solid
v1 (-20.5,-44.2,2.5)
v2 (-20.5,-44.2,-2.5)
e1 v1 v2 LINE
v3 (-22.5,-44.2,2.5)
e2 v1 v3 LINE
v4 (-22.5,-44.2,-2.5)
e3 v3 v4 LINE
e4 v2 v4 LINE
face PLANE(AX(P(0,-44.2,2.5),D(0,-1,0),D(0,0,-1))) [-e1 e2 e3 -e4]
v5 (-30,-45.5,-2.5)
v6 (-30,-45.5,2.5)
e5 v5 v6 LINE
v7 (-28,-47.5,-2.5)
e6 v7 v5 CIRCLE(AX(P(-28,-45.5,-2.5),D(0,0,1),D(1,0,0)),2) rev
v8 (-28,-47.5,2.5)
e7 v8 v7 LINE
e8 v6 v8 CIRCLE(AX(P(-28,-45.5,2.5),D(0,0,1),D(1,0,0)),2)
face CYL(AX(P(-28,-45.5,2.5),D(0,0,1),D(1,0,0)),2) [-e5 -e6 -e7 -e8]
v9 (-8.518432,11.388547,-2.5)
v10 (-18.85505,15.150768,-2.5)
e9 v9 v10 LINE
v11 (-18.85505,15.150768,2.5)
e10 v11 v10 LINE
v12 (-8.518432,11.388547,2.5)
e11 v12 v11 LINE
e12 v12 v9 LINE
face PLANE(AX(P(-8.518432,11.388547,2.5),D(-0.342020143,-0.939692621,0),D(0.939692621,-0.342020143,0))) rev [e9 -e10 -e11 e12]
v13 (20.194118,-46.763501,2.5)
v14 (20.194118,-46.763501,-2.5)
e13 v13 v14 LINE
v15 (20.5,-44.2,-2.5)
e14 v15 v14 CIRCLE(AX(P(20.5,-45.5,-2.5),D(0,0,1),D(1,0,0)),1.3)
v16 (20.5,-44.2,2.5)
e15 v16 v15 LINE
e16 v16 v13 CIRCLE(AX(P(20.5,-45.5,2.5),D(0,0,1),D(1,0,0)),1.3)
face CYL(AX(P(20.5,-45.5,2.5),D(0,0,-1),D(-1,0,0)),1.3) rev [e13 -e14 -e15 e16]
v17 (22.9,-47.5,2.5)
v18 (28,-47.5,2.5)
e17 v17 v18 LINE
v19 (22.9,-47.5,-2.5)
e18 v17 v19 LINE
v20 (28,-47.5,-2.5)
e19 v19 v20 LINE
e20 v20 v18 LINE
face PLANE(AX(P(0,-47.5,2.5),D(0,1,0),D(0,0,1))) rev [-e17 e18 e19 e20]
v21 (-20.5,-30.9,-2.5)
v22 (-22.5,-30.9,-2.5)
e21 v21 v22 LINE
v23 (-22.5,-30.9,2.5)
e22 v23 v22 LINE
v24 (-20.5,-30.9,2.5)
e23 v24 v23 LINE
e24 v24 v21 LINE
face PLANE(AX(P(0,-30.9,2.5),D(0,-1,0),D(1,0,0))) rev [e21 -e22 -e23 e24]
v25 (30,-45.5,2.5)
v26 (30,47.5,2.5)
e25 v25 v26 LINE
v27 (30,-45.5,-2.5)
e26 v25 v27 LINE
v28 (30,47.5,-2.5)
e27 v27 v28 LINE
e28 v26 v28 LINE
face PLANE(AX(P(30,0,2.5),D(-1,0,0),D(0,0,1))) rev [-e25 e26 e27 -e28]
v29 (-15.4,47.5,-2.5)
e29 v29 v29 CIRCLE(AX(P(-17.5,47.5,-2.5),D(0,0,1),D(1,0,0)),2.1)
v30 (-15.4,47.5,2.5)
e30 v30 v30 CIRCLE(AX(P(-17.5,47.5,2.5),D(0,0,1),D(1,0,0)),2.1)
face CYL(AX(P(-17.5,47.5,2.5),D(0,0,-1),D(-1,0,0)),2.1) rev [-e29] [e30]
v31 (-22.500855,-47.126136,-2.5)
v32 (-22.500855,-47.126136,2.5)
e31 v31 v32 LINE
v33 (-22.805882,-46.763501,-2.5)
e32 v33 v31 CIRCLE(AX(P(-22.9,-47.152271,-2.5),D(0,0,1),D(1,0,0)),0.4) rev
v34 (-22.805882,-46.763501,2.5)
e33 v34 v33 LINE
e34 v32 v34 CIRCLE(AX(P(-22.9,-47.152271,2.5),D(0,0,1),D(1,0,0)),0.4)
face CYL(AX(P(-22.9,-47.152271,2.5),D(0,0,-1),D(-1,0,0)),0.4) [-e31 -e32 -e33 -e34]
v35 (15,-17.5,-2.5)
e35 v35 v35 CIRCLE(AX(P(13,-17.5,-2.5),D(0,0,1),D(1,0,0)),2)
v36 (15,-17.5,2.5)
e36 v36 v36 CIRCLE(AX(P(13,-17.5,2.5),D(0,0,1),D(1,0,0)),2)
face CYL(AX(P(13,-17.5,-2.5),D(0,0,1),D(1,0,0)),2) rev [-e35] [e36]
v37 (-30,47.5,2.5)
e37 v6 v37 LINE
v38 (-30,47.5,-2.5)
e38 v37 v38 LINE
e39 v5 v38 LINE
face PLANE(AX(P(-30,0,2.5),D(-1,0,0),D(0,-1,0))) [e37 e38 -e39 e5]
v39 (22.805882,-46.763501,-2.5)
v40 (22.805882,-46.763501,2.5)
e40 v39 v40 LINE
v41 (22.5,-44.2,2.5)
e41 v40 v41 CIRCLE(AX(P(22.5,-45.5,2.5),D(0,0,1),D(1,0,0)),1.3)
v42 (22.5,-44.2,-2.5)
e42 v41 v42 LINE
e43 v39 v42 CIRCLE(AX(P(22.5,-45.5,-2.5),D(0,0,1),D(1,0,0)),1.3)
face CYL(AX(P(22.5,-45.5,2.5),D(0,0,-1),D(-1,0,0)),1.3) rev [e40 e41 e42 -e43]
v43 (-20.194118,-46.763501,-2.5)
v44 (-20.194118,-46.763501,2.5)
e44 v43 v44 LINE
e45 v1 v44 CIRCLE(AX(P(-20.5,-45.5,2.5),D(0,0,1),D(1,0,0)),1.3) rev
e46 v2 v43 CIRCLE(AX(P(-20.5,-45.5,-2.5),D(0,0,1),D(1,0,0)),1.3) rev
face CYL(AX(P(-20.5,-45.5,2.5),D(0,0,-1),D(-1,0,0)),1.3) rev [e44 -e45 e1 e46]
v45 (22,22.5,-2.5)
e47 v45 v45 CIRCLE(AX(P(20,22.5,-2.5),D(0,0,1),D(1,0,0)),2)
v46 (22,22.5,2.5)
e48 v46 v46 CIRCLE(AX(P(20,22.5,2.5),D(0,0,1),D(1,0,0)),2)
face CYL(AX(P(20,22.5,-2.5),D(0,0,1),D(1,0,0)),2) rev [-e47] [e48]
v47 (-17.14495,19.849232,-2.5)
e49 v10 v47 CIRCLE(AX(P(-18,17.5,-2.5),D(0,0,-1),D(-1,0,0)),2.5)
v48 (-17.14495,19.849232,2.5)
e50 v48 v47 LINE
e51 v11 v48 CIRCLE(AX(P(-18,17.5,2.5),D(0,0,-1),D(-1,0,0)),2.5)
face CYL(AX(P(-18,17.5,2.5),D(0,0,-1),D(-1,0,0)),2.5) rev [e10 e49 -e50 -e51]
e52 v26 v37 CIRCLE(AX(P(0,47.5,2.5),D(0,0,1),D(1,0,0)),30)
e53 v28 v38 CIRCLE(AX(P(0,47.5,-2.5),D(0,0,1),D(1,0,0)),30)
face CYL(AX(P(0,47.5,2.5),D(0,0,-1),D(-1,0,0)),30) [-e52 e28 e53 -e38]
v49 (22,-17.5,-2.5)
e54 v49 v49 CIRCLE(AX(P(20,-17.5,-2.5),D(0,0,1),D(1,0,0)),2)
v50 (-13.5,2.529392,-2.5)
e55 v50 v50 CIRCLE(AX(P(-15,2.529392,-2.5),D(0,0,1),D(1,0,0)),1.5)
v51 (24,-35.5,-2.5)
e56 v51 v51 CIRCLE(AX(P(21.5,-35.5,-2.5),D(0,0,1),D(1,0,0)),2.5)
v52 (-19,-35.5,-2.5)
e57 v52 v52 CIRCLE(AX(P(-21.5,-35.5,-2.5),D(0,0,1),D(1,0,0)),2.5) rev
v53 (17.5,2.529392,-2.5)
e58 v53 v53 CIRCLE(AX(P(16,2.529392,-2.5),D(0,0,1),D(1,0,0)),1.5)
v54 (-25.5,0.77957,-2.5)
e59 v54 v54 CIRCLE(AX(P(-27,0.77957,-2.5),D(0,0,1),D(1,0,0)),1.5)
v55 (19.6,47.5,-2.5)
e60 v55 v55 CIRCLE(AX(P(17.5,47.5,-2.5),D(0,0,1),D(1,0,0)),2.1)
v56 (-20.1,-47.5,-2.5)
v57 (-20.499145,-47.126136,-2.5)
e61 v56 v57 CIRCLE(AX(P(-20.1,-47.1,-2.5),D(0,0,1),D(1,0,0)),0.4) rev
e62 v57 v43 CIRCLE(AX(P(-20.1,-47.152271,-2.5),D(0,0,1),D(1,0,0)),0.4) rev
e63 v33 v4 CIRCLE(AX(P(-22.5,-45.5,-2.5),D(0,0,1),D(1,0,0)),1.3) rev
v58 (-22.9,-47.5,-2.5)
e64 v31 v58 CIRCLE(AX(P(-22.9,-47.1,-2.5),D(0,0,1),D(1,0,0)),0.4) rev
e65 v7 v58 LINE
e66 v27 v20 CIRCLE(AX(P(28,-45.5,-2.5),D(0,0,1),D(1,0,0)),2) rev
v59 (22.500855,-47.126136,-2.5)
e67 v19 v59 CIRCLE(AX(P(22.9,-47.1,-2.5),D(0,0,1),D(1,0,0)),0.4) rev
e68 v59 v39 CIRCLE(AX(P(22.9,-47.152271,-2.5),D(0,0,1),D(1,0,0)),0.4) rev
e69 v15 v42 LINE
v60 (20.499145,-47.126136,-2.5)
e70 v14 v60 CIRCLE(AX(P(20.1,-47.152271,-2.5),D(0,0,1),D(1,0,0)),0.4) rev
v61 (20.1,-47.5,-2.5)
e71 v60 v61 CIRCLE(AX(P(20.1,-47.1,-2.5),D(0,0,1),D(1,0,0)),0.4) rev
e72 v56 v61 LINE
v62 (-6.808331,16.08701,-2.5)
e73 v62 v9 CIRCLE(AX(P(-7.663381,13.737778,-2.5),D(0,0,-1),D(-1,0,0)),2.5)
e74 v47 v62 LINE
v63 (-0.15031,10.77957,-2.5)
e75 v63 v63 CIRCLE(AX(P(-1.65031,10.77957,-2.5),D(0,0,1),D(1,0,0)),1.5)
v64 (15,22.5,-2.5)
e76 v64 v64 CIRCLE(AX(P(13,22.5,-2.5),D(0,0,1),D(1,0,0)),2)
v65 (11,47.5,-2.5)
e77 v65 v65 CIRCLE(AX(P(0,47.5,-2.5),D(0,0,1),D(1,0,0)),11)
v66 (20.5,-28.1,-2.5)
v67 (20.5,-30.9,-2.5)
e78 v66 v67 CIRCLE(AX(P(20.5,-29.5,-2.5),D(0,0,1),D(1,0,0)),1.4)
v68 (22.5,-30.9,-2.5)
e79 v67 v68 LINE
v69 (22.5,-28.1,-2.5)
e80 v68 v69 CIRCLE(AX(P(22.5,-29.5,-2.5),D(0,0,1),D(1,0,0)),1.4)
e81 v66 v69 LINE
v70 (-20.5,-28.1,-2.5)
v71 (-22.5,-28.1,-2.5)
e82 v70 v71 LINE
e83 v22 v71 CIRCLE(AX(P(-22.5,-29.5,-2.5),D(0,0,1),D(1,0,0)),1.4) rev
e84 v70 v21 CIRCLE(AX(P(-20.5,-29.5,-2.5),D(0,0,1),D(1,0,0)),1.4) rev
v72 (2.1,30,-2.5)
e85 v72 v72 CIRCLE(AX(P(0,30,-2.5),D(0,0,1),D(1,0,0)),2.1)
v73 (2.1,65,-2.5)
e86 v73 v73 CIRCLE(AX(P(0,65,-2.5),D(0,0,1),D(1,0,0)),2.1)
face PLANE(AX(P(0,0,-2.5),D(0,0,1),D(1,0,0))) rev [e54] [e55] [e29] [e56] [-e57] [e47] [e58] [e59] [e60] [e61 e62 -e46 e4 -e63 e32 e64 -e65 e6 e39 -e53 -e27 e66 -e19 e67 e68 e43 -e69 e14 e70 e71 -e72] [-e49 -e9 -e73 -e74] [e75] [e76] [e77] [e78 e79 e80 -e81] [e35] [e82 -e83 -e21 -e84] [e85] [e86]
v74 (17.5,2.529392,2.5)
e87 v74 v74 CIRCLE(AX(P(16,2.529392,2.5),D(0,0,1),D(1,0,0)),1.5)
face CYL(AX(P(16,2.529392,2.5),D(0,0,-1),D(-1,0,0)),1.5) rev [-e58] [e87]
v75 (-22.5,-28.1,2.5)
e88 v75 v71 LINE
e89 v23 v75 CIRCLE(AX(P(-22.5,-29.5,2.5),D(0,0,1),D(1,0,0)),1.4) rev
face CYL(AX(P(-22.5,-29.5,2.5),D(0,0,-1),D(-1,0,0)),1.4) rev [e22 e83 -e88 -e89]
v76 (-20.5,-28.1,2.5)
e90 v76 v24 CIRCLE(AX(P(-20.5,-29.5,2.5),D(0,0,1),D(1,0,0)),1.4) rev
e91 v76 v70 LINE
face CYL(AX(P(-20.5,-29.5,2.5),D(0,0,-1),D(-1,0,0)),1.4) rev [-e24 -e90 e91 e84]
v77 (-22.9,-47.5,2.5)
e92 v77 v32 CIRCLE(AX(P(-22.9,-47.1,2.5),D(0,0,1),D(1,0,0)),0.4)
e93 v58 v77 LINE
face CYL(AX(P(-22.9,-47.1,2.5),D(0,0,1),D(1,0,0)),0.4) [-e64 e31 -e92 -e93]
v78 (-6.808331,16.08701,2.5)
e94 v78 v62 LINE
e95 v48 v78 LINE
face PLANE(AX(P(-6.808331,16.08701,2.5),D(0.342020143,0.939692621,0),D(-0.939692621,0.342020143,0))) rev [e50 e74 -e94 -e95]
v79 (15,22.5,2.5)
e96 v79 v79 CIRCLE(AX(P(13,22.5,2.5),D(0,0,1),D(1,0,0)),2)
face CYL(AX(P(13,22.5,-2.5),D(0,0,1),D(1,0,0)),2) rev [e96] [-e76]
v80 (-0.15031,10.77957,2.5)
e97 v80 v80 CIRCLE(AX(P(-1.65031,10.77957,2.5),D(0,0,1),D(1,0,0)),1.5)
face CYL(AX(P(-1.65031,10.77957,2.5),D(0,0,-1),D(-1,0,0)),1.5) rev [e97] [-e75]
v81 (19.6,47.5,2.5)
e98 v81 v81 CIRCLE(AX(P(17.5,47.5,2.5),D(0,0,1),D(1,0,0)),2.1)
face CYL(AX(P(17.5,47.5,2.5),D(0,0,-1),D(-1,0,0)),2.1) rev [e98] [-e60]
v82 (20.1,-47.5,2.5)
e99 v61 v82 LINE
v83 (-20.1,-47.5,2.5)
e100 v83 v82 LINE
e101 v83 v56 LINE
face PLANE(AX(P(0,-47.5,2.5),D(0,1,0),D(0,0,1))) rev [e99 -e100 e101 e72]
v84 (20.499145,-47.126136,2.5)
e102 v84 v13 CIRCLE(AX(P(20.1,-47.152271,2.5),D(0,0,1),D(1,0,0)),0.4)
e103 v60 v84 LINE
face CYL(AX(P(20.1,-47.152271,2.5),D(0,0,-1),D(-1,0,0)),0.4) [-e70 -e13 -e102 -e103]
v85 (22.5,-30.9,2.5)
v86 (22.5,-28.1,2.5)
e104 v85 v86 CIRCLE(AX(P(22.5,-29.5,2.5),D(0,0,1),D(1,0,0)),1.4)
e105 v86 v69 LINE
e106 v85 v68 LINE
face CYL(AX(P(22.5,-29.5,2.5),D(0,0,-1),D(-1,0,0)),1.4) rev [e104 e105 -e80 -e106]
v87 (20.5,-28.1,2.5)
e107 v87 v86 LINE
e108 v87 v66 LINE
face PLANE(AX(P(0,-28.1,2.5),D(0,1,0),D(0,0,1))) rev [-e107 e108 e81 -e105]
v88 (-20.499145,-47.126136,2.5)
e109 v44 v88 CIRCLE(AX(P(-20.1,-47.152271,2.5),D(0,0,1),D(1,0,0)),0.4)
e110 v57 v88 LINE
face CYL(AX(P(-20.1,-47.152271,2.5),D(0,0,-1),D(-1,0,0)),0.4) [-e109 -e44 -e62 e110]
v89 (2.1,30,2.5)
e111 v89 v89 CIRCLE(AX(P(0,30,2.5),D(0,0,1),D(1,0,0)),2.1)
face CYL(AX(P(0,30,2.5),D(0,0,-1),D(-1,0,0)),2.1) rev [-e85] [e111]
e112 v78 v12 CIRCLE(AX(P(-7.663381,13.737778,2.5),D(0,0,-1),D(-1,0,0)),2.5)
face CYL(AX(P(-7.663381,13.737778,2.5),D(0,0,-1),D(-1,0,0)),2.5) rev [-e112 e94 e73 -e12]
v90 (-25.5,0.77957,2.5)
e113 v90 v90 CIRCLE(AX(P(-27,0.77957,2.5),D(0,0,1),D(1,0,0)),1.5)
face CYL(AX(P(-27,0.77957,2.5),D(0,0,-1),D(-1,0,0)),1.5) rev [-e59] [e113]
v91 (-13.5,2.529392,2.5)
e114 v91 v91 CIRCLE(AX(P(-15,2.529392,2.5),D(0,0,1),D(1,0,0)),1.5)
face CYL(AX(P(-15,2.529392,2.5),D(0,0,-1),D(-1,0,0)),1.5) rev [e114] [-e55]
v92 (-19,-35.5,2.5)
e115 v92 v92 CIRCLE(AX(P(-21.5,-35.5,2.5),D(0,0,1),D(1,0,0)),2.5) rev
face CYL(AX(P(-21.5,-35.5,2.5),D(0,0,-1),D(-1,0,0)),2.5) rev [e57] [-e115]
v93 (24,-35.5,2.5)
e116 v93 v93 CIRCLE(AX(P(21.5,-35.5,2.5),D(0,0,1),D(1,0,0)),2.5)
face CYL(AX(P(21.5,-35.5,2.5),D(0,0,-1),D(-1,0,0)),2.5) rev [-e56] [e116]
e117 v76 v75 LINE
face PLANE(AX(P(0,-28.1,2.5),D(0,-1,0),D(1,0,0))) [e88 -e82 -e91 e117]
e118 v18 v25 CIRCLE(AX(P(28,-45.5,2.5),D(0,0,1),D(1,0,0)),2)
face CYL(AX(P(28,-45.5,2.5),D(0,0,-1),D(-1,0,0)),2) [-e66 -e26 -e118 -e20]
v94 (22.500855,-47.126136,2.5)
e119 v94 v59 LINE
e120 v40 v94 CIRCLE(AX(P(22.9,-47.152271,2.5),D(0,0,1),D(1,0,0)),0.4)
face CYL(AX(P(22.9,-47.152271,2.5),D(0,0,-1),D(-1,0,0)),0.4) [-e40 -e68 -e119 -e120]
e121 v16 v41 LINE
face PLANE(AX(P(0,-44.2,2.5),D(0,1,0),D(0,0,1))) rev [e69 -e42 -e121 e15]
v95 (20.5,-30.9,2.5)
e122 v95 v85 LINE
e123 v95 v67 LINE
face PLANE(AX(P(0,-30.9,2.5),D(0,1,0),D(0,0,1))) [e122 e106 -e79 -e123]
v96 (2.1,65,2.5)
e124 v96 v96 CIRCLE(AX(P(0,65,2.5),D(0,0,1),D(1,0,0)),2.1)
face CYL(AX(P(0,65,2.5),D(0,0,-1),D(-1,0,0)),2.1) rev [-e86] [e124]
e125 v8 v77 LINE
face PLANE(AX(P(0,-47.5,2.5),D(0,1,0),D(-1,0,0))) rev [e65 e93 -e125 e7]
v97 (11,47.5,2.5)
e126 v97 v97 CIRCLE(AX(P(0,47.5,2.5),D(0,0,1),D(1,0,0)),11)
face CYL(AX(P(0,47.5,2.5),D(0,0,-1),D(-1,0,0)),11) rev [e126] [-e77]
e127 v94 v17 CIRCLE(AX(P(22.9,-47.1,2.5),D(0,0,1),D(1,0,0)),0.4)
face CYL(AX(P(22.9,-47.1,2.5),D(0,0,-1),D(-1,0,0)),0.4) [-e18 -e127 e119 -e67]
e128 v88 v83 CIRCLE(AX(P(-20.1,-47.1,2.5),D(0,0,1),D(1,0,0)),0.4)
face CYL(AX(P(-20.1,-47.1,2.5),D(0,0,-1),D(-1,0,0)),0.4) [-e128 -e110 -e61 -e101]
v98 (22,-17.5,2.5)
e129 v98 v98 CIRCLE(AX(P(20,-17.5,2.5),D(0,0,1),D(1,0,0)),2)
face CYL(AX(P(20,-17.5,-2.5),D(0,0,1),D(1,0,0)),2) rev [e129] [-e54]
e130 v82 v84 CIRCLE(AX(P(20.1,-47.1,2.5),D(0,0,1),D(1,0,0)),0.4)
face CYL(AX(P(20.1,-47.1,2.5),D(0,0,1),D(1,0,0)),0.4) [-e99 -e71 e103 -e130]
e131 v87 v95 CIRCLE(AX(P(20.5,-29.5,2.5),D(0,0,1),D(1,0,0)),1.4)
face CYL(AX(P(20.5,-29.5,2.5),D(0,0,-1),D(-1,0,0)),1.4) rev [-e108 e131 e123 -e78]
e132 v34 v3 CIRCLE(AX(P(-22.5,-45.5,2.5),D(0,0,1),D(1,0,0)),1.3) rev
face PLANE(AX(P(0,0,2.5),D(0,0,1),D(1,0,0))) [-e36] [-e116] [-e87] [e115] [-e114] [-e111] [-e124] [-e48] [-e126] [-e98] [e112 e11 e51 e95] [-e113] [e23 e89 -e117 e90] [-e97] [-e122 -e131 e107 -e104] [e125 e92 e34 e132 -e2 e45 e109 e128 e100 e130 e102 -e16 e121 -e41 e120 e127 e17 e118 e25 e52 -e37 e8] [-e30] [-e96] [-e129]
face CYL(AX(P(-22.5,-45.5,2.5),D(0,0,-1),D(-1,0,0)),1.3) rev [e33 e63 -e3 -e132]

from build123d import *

# Parameters (mm, degrees)
SKETCH1_R           = 11
SKETCH1_R_2         = 2.5
SKETCH1_R_3         = 2.1
SKETCH1_R_4         = 1.5
BOSS_EXTRUDE1_DEPTH = 2.5
CUT_EXTRUDE1_DEPTH  = 84.254129027
SKETCH3_R           = 2
CUT_EXTRUDE2_DEPTH  = 84.254129027
FILLET1_R           = 0.4
FILLET2_R           = 2


with BuildPart() as part:
    # Sketch1 → Boss-Extrude1 (new, symmetric)
    with BuildSketch(Plane.XY):
        with BuildLine():
            Line((-30, -47.5), (-22.5, -47.5))
            Line((-22.5, -47.5), (-22.5, -46.8))
            ThreePointArc((-22.5, -46.8), (-23.8, -45.5), (-22.5, -44.2))
            Line((-22.5, -44.2), (-20.5, -44.2))
            ThreePointArc((-20.5, -44.2), (-19.2, -45.5), (-20.5, -46.8))
            Line((-20.5, -46.8), (-20.5, -47.5))
            Line((-20.5, -47.5), (20.5, -47.5))
            Line((20.5, -47.5), (20.5, -46.8))
            ThreePointArc((20.5, -46.8), (19.2, -45.5), (20.5, -44.2))
            Line((20.5, -44.2), (22.5, -44.2))
            ThreePointArc((22.5, -44.2), (23.8, -45.5), (22.5, -46.8))
            Line((22.5, -46.8), (22.5, -47.5))
            Line((22.5, -47.5), (30, -47.5))
            Line((30, -47.5), (30, 47.5))
            ThreePointArc((30, 47.5), (0, 77.5), (-30, 47.5))
            Line((-30, 47.5), (-30, -47.5))
        make_face()
        with Locations((0, 47.5)):
            Circle(SKETCH1_R, mode=Mode.SUBTRACT)
        with Locations((21.5, -35.5)):
            Circle(SKETCH1_R_2, mode=Mode.SUBTRACT)
        with Locations((-21.5, -35.5)):
            Circle(SKETCH1_R_2, mode=Mode.SUBTRACT)
        with Locations((0, 30)):
            Circle(SKETCH1_R_3, mode=Mode.SUBTRACT)
        with Locations((-17.5, 47.5)):
            Circle(SKETCH1_R_3, mode=Mode.SUBTRACT)
        with Locations((0, 65)):
            Circle(SKETCH1_R_3, mode=Mode.SUBTRACT)
        with Locations((17.5, 47.5)):
            Circle(SKETCH1_R_3, mode=Mode.SUBTRACT)
        with Locations((-27, 0.779569979)):
            Circle(SKETCH1_R_4, mode=Mode.SUBTRACT)
        with Locations((-1.65030964, 10.779569979)):
            Circle(SKETCH1_R_4, mode=Mode.SUBTRACT)
        with Locations((16, 2.529392469)):
            Circle(SKETCH1_R_4, mode=Mode.SUBTRACT)
        with Locations((-15, 2.529392469)):
            Circle(SKETCH1_R_4, mode=Mode.SUBTRACT)
        with BuildLine():
            Line((20.5, -28.1), (22.5, -28.1))
            ThreePointArc((22.5, -28.1), (23.9, -29.5), (22.5, -30.9))
            Line((22.5, -30.9), (20.5, -30.9))
            ThreePointArc((20.5, -30.9), (19.1, -29.5), (20.5, -28.1))
        make_face(mode=Mode.SUBTRACT)
        with BuildLine():
            Line((-20.5, -28.1), (-22.5, -28.1))
            ThreePointArc((-22.5, -28.1), (-23.9, -29.5), (-22.5, -30.9))
            Line((-22.5, -30.9), (-20.5, -30.9))
            ThreePointArc((-20.5, -30.9), (-19.1, -29.5), (-20.5, -28.1))
        make_face(mode=Mode.SUBTRACT)
    extrude(amount=BOSS_EXTRUDE1_DEPTH, both=True)

    # Sketch2 → Cut-Extrude1 (cut, through all)
    with BuildSketch(Plane(origin=(0, 0, -2.5), x_dir=(-1, 0, 0), z_dir=(0, 0, -1))):
        with BuildLine():
            Line((8.51843153, 11.388546871), (18.855050358, 15.150768448))
            ThreePointArc((18.855050358, 15.150768448), (20.349231552, 18.355050358), (17.144949642, 19.849231552))
            Line((17.144949642, 19.849231552), (6.808330813, 16.087009975))
            ThreePointArc((6.808330813, 16.087009975), (5.314149619, 12.882728065), (8.51843153, 11.388546871))
        make_face()
    extrude(amount=-CUT_EXTRUDE1_DEPTH, mode=Mode.SUBTRACT)

    # Sketch3 → Cut-Extrude2 (cut, through all)
    with BuildSketch(Plane.XY.offset(2.5)):
        with Locations((13, -17.5)):
            Circle(SKETCH3_R)
        with Locations((20, -17.5)):
            Circle(SKETCH3_R)
        with Locations((13, 22.5)):
            Circle(SKETCH3_R)
        with Locations((20, 22.5)):
            Circle(SKETCH3_R)
    extrude(amount=-CUT_EXTRUDE2_DEPTH, mode=Mode.SUBTRACT)

    # Fillet1
    # the kernel refuses this fillet: 0.4 mm, written as the material it takes off along each edge
    with BuildSketch(Plane(origin=(22.5, -47.5, -3.5), x_dir=(1, 0, 0), z_dir=(0, 0, 1))) as fillet1_piece_1:
        with BuildLine():
            CenterArc((FILLET1_R, FILLET1_R), FILLET1_R, 180, 90)
            Line((0, FILLET1_R), (0, 0))
            Line((0, 0), (FILLET1_R, 0))
        make_face()
    extrude(amount=7, mode=Mode.SUBTRACT)
    with BuildSketch(Plane(origin=(22.5, -46.8, -3.38067791), x_dir=(0, -1, 0), z_dir=(0, 0, 1))) as fillet1_piece_2:
        with BuildLine():
            CenterArc((0.352271164, 0.4), FILLET1_R, 193.608960631, 76.391039369)
            ThreePointArc((-0.036498522, 0.305882353), (-0.00915688, 0.154026098), (0, 0))
            Line((0, 0), (0.352271164, 0))
        make_face()
    extrude(amount=6.761355821, mode=Mode.SUBTRACT)
    with BuildSketch(Plane(origin=(20.5, -47.5, -3.5), x_dir=(-1, 0, 0), z_dir=(0, 0, 1)), Plane(origin=(-20.5, -47.5, -3.5), x_dir=(0, 1, 0), z_dir=(0, 0, 1)), Plane(origin=(-22.5, -47.5, -3.5), x_dir=(-1, 0, 0), z_dir=(0, 0, 1))) as fillet1_piece_3:
        with BuildLine():
            CenterArc((FILLET1_R, -FILLET1_R), FILLET1_R, 90, 90)
            Line((0, -FILLET1_R), (0, 0))
            Line((0, 0), (FILLET1_R, 0))
        make_face()
    extrude(amount=7, mode=Mode.SUBTRACT)
    with BuildSketch(Plane(origin=(20.5, -46.8, -3.38067791), x_dir=(-0.9929562463238142, 0.11848161412860948, 0), z_dir=(0, 0, 1))) as fillet1_piece_4:
        with BuildLine():
            CenterArc((0.355444842, 0.397182499), FILLET1_R, 186.804480315, 76.391039369)
            Line((-0.041737656, 0.349789853), (0, 0))
            ThreePointArc((0, 0), (0.154026098, 0.00915688), (0.308052197, 0))
        make_face()
    extrude(amount=6.761355821, mode=Mode.SUBTRACT)
    with BuildSketch(Plane(origin=(-20.5, -46.8, -3.38067791), x_dir=(0.9929562463238113, 0.11848161412863496, 0), z_dir=(0, 0, 1))) as fillet1_piece_5:
        with BuildLine():
            CenterArc((0.355444842, -0.397182499), FILLET1_R, 96.804480315, 76.391039369)
            Line((-0.041737656, -0.349789853), (0, 0))
            ThreePointArc((0, 0), (0.154026098, -0.00915688), (0.308052197, 0))
        make_face()
    extrude(amount=6.761355821, mode=Mode.SUBTRACT)
    with BuildSketch(Plane(origin=(-22.5, -46.8, -3.38067791), x_dir=(0, -1, 0), z_dir=(0, 0, 1))) as fillet1_piece_6:
        with BuildLine():
            CenterArc((0.352271164, -0.4), FILLET1_R, 90, 76.391039369)
            ThreePointArc((-0.036498522, -0.305882353), (-0.00915688, -0.154026098), (0, 0))
            Line((0, 0), (0.352271164, 0))
        make_face()
    extrude(amount=6.761355821, mode=Mode.SUBTRACT)

    # Fillet2
    fillet2_edges = [part.edges().sort_by_distance(p)[0] for p in [
        (30, -47.5, 0),
        (-30, -47.5, 0),
    ]]
    fillet(fillet2_edges, radius=FILLET2_R)


solid = part.part
